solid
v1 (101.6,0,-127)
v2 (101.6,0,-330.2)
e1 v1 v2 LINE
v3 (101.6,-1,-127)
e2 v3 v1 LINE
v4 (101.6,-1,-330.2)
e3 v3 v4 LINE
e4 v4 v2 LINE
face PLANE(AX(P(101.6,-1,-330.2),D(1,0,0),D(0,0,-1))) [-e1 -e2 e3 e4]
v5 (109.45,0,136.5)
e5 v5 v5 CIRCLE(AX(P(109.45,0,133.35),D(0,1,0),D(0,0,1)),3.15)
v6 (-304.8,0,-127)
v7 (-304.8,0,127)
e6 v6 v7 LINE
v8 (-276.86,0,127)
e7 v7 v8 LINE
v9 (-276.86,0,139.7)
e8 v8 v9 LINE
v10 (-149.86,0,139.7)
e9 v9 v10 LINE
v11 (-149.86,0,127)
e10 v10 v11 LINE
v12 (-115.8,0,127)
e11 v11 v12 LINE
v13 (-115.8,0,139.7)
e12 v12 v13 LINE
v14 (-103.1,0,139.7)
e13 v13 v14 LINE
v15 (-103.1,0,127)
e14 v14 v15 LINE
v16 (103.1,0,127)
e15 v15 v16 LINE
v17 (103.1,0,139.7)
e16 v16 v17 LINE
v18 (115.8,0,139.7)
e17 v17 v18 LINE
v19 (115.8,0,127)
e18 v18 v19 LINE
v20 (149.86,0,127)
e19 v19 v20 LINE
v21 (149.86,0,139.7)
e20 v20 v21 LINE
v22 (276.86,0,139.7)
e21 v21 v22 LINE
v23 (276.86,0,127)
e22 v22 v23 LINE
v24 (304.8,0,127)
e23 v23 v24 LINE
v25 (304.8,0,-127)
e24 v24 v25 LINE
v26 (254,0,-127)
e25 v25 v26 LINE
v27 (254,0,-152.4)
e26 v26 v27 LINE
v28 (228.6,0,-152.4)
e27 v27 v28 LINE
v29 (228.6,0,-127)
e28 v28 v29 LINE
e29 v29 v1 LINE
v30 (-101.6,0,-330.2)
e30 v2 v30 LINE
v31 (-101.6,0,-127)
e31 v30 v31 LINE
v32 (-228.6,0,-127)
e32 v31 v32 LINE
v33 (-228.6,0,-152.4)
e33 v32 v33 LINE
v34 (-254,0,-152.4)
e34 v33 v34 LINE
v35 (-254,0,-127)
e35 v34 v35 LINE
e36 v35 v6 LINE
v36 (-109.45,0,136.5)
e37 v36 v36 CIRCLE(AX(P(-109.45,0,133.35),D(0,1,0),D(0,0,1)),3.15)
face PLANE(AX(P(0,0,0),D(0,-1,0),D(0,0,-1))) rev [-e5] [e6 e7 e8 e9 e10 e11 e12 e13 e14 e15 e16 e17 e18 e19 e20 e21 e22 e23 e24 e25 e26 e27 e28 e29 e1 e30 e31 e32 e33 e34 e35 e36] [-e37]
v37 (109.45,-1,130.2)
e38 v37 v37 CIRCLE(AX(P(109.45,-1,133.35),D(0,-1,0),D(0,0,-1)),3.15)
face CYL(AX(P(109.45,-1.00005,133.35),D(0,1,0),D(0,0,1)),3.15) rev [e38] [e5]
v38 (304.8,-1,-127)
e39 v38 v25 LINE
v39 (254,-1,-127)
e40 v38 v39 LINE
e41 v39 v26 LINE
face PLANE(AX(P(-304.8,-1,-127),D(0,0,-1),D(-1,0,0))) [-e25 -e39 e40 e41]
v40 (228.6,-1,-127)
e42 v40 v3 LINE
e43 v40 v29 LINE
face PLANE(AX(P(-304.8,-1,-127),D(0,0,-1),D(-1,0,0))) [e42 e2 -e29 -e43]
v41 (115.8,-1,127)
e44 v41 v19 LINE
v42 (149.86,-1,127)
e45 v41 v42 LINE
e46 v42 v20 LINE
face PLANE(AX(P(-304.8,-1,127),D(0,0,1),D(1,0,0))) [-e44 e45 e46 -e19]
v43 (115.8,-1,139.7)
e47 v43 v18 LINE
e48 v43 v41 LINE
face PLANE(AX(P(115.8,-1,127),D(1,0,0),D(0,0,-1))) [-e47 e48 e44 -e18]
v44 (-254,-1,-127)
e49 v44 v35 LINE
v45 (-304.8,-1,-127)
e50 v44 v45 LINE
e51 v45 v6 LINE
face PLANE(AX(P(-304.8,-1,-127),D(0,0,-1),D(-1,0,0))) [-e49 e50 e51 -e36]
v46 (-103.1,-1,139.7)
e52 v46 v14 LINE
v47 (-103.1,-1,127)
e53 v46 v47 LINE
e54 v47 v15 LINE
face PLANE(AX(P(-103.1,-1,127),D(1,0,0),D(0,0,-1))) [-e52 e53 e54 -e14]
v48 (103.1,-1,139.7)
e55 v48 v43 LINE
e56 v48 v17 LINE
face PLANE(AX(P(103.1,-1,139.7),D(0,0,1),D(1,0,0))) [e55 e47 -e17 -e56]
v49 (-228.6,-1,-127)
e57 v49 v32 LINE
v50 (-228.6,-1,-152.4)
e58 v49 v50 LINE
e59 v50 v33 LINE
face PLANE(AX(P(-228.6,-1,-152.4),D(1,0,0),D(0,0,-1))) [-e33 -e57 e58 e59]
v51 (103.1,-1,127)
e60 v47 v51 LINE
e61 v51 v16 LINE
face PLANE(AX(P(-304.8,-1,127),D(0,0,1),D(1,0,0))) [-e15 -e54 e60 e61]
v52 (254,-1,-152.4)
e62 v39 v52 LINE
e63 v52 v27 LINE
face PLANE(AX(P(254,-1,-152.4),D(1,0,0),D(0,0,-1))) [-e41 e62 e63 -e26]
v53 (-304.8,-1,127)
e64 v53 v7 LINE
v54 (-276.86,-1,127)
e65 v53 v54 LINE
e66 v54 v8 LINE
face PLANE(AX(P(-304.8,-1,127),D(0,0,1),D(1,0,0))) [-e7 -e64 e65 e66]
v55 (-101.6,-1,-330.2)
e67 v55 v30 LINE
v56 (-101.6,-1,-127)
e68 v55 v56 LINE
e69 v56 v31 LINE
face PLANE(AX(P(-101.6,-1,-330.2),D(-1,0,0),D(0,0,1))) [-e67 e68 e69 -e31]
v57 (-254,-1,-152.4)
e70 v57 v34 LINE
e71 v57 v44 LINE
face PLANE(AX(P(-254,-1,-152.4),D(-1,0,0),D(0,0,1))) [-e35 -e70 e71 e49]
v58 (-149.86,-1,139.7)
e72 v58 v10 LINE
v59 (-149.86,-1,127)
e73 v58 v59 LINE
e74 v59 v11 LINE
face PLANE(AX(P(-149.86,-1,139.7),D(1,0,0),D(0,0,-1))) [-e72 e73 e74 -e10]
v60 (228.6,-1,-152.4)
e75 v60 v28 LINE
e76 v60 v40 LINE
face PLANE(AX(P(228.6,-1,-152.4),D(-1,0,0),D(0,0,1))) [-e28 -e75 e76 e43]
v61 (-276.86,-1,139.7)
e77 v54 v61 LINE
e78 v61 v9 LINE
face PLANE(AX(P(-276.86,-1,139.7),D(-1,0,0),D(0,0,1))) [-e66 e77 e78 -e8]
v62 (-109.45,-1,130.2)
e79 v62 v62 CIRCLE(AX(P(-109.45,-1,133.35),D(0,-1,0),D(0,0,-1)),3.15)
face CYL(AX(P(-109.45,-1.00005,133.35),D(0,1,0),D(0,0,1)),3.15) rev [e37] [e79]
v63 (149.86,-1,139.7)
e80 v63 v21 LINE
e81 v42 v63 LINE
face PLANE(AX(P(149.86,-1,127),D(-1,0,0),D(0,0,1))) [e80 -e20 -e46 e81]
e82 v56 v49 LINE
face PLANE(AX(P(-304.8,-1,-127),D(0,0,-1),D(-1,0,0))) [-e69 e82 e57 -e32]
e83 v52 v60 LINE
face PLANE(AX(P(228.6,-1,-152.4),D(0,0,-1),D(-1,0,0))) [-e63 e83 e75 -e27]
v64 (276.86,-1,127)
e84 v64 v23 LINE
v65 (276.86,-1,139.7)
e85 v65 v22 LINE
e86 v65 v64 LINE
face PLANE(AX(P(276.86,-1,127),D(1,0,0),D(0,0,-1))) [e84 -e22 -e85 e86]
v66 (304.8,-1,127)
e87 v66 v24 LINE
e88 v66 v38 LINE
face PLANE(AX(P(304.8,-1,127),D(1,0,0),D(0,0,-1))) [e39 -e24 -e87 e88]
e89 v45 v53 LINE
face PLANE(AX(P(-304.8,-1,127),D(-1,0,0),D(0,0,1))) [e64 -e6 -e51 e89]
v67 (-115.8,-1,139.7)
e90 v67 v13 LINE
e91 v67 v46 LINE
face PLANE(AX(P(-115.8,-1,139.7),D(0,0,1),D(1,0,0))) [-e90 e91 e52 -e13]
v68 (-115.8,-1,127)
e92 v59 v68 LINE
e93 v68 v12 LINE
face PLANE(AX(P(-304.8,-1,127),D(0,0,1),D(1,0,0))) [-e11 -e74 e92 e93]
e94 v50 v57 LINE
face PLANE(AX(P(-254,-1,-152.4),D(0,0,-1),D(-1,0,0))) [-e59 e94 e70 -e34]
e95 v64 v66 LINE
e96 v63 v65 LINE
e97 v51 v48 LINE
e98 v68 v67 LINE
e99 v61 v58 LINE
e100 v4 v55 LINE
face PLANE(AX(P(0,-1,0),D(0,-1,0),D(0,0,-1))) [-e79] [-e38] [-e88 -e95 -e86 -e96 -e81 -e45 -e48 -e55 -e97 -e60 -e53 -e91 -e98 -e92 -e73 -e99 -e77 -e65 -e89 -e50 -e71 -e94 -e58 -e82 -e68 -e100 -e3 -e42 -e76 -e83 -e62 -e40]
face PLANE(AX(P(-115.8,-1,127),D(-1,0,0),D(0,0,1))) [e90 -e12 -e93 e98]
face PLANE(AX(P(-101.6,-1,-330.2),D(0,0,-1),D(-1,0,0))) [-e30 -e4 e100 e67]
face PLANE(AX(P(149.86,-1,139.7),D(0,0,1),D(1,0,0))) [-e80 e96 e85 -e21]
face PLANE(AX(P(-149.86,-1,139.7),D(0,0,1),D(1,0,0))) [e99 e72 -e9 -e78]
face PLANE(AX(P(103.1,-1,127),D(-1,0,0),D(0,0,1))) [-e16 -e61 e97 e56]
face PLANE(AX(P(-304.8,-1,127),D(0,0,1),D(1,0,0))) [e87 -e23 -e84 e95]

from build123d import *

# Parameters (mm, degrees)
SKETCH1_W          = 609.6
SKETCH1_H          = 254
BASE_FLANGE1_DEPTH = 1
SKETCH6_W          = 25.4
SKETCH6_H          = 25.4
TAB2_DEPTH         = 1
SKETCH11_W         = 25.4
SKETCH11_H         = 25.4
TAB3_DEPTH         = 1
SKETCH14_W         = 203.2
SKETCH14_H         = 203.2
TAB4_DEPTH         = 1
SKETCH17_W         = 127
SKETCH17_H         = 12.7
TAB5_DEPTH         = 1
SKETCH20_W         = 127
SKETCH20_H         = 12.7
TAB7_DEPTH         = 1
SKETCH25_W         = 12.7
SKETCH25_H         = 12.7
TAB8_DEPTH         = 1
SKETCH28_W         = 12.7
SKETCH28_H         = 12.7
TAB10_DEPTH        = 1
SKETCH36_R         = 3.15
CUT_EXTRUDE2_DEPTH = 450.372985392
SKETCH38_R         = 3.15
CUT_EXTRUDE3_DEPTH = 450.372985392


# Sheet-metal steps are written as plain solids
with BuildPart() as part:
    # Sketch1 → Base-Flange1 (new body)
    with BuildSketch(Plane(origin=(0, 0, 0), x_dir=(1, 0, 0), z_dir=(0, 1, 0))):
        Rectangle(SKETCH1_W, SKETCH1_H)
    extrude(amount=-BASE_FLANGE1_DEPTH)

    # Sketch6 → Tab2 (add)
    with BuildSketch(Plane(origin=(0, 0, 0), x_dir=(1, 0, 0), z_dir=(0, 1, 0))):
        with Locations((-241.3, 139.7)):
            Rectangle(SKETCH6_W, SKETCH6_H)
    extrude(amount=-TAB2_DEPTH)

    # Sketch11 → Tab3 (add)
    with BuildSketch(Plane(origin=(0, 0, 0), x_dir=(1, 0, 0), z_dir=(0, 1, 0))):
        with Locations((241.3, 139.7)):
            Rectangle(SKETCH11_W, SKETCH11_H)
    extrude(amount=-TAB3_DEPTH)

    # Sketch14 → Tab4 (add)
    with BuildSketch(Plane(origin=(0, 0, 0), x_dir=(1, 0, 0), z_dir=(0, 1, 0))):
        with Locations((0, 228.6)):
            Rectangle(SKETCH14_W, SKETCH14_H)
    extrude(amount=-TAB4_DEPTH)

    # Sketch17 → Tab5 (add)
    with BuildSketch(Plane(origin=(0, 0, 0), x_dir=(1, 0, 0), z_dir=(0, 1, 0))):
        with Locations((-213.36, -133.35)):
            Rectangle(SKETCH17_W, SKETCH17_H)
    extrude(amount=-TAB5_DEPTH)

    # Sketch20 → Tab7 (add)
    with BuildSketch(Plane(origin=(0, 0, 0), x_dir=(1, 0, 0), z_dir=(0, 1, 0))):
        with Locations((213.36, -133.35)):
            Rectangle(SKETCH20_W, SKETCH20_H)
    extrude(amount=-TAB7_DEPTH)

    # Sketch25 → Tab8 (add)
    with BuildSketch(Plane(origin=(0, 0, 0), x_dir=(1, 0, 0), z_dir=(0, 1, 0))):
        with Locations((-109.45, -133.35)):
            Rectangle(SKETCH25_W, SKETCH25_H)
    extrude(amount=-TAB8_DEPTH)

    # Sketch28 → Tab10 (add)
    with BuildSketch(Plane(origin=(0, 0, 0), x_dir=(1, 0, 0), z_dir=(0, 1, 0))):
        with Locations((109.45, -133.35)):
            Rectangle(SKETCH28_W, SKETCH28_H)
    extrude(amount=-TAB10_DEPTH)

    # Sketch36 → Cut-Extrude2 (cut, through all)
    with BuildSketch(Plane(origin=(0, 0, 0), x_dir=(1, 0, 0), z_dir=(0, 1, 0))):
        with Locations(Location((-109.45, -133.35, 0), (0, 0, 270))):
            Circle(SKETCH36_R)
    extrude(amount=-CUT_EXTRUDE2_DEPTH, mode=Mode.SUBTRACT)

    # Sketch38 → Cut-Extrude3 (cut, through all)
    with BuildSketch(Plane(origin=(0, 0, 0), x_dir=(1, 0, 0), z_dir=(0, 1, 0))):
        with Locations(Location((109.45, -133.35, 0), (0, 0, 270))):
            Circle(SKETCH38_R)
    extrude(amount=-CUT_EXTRUDE3_DEPTH, mode=Mode.SUBTRACT)


solid = part.part
